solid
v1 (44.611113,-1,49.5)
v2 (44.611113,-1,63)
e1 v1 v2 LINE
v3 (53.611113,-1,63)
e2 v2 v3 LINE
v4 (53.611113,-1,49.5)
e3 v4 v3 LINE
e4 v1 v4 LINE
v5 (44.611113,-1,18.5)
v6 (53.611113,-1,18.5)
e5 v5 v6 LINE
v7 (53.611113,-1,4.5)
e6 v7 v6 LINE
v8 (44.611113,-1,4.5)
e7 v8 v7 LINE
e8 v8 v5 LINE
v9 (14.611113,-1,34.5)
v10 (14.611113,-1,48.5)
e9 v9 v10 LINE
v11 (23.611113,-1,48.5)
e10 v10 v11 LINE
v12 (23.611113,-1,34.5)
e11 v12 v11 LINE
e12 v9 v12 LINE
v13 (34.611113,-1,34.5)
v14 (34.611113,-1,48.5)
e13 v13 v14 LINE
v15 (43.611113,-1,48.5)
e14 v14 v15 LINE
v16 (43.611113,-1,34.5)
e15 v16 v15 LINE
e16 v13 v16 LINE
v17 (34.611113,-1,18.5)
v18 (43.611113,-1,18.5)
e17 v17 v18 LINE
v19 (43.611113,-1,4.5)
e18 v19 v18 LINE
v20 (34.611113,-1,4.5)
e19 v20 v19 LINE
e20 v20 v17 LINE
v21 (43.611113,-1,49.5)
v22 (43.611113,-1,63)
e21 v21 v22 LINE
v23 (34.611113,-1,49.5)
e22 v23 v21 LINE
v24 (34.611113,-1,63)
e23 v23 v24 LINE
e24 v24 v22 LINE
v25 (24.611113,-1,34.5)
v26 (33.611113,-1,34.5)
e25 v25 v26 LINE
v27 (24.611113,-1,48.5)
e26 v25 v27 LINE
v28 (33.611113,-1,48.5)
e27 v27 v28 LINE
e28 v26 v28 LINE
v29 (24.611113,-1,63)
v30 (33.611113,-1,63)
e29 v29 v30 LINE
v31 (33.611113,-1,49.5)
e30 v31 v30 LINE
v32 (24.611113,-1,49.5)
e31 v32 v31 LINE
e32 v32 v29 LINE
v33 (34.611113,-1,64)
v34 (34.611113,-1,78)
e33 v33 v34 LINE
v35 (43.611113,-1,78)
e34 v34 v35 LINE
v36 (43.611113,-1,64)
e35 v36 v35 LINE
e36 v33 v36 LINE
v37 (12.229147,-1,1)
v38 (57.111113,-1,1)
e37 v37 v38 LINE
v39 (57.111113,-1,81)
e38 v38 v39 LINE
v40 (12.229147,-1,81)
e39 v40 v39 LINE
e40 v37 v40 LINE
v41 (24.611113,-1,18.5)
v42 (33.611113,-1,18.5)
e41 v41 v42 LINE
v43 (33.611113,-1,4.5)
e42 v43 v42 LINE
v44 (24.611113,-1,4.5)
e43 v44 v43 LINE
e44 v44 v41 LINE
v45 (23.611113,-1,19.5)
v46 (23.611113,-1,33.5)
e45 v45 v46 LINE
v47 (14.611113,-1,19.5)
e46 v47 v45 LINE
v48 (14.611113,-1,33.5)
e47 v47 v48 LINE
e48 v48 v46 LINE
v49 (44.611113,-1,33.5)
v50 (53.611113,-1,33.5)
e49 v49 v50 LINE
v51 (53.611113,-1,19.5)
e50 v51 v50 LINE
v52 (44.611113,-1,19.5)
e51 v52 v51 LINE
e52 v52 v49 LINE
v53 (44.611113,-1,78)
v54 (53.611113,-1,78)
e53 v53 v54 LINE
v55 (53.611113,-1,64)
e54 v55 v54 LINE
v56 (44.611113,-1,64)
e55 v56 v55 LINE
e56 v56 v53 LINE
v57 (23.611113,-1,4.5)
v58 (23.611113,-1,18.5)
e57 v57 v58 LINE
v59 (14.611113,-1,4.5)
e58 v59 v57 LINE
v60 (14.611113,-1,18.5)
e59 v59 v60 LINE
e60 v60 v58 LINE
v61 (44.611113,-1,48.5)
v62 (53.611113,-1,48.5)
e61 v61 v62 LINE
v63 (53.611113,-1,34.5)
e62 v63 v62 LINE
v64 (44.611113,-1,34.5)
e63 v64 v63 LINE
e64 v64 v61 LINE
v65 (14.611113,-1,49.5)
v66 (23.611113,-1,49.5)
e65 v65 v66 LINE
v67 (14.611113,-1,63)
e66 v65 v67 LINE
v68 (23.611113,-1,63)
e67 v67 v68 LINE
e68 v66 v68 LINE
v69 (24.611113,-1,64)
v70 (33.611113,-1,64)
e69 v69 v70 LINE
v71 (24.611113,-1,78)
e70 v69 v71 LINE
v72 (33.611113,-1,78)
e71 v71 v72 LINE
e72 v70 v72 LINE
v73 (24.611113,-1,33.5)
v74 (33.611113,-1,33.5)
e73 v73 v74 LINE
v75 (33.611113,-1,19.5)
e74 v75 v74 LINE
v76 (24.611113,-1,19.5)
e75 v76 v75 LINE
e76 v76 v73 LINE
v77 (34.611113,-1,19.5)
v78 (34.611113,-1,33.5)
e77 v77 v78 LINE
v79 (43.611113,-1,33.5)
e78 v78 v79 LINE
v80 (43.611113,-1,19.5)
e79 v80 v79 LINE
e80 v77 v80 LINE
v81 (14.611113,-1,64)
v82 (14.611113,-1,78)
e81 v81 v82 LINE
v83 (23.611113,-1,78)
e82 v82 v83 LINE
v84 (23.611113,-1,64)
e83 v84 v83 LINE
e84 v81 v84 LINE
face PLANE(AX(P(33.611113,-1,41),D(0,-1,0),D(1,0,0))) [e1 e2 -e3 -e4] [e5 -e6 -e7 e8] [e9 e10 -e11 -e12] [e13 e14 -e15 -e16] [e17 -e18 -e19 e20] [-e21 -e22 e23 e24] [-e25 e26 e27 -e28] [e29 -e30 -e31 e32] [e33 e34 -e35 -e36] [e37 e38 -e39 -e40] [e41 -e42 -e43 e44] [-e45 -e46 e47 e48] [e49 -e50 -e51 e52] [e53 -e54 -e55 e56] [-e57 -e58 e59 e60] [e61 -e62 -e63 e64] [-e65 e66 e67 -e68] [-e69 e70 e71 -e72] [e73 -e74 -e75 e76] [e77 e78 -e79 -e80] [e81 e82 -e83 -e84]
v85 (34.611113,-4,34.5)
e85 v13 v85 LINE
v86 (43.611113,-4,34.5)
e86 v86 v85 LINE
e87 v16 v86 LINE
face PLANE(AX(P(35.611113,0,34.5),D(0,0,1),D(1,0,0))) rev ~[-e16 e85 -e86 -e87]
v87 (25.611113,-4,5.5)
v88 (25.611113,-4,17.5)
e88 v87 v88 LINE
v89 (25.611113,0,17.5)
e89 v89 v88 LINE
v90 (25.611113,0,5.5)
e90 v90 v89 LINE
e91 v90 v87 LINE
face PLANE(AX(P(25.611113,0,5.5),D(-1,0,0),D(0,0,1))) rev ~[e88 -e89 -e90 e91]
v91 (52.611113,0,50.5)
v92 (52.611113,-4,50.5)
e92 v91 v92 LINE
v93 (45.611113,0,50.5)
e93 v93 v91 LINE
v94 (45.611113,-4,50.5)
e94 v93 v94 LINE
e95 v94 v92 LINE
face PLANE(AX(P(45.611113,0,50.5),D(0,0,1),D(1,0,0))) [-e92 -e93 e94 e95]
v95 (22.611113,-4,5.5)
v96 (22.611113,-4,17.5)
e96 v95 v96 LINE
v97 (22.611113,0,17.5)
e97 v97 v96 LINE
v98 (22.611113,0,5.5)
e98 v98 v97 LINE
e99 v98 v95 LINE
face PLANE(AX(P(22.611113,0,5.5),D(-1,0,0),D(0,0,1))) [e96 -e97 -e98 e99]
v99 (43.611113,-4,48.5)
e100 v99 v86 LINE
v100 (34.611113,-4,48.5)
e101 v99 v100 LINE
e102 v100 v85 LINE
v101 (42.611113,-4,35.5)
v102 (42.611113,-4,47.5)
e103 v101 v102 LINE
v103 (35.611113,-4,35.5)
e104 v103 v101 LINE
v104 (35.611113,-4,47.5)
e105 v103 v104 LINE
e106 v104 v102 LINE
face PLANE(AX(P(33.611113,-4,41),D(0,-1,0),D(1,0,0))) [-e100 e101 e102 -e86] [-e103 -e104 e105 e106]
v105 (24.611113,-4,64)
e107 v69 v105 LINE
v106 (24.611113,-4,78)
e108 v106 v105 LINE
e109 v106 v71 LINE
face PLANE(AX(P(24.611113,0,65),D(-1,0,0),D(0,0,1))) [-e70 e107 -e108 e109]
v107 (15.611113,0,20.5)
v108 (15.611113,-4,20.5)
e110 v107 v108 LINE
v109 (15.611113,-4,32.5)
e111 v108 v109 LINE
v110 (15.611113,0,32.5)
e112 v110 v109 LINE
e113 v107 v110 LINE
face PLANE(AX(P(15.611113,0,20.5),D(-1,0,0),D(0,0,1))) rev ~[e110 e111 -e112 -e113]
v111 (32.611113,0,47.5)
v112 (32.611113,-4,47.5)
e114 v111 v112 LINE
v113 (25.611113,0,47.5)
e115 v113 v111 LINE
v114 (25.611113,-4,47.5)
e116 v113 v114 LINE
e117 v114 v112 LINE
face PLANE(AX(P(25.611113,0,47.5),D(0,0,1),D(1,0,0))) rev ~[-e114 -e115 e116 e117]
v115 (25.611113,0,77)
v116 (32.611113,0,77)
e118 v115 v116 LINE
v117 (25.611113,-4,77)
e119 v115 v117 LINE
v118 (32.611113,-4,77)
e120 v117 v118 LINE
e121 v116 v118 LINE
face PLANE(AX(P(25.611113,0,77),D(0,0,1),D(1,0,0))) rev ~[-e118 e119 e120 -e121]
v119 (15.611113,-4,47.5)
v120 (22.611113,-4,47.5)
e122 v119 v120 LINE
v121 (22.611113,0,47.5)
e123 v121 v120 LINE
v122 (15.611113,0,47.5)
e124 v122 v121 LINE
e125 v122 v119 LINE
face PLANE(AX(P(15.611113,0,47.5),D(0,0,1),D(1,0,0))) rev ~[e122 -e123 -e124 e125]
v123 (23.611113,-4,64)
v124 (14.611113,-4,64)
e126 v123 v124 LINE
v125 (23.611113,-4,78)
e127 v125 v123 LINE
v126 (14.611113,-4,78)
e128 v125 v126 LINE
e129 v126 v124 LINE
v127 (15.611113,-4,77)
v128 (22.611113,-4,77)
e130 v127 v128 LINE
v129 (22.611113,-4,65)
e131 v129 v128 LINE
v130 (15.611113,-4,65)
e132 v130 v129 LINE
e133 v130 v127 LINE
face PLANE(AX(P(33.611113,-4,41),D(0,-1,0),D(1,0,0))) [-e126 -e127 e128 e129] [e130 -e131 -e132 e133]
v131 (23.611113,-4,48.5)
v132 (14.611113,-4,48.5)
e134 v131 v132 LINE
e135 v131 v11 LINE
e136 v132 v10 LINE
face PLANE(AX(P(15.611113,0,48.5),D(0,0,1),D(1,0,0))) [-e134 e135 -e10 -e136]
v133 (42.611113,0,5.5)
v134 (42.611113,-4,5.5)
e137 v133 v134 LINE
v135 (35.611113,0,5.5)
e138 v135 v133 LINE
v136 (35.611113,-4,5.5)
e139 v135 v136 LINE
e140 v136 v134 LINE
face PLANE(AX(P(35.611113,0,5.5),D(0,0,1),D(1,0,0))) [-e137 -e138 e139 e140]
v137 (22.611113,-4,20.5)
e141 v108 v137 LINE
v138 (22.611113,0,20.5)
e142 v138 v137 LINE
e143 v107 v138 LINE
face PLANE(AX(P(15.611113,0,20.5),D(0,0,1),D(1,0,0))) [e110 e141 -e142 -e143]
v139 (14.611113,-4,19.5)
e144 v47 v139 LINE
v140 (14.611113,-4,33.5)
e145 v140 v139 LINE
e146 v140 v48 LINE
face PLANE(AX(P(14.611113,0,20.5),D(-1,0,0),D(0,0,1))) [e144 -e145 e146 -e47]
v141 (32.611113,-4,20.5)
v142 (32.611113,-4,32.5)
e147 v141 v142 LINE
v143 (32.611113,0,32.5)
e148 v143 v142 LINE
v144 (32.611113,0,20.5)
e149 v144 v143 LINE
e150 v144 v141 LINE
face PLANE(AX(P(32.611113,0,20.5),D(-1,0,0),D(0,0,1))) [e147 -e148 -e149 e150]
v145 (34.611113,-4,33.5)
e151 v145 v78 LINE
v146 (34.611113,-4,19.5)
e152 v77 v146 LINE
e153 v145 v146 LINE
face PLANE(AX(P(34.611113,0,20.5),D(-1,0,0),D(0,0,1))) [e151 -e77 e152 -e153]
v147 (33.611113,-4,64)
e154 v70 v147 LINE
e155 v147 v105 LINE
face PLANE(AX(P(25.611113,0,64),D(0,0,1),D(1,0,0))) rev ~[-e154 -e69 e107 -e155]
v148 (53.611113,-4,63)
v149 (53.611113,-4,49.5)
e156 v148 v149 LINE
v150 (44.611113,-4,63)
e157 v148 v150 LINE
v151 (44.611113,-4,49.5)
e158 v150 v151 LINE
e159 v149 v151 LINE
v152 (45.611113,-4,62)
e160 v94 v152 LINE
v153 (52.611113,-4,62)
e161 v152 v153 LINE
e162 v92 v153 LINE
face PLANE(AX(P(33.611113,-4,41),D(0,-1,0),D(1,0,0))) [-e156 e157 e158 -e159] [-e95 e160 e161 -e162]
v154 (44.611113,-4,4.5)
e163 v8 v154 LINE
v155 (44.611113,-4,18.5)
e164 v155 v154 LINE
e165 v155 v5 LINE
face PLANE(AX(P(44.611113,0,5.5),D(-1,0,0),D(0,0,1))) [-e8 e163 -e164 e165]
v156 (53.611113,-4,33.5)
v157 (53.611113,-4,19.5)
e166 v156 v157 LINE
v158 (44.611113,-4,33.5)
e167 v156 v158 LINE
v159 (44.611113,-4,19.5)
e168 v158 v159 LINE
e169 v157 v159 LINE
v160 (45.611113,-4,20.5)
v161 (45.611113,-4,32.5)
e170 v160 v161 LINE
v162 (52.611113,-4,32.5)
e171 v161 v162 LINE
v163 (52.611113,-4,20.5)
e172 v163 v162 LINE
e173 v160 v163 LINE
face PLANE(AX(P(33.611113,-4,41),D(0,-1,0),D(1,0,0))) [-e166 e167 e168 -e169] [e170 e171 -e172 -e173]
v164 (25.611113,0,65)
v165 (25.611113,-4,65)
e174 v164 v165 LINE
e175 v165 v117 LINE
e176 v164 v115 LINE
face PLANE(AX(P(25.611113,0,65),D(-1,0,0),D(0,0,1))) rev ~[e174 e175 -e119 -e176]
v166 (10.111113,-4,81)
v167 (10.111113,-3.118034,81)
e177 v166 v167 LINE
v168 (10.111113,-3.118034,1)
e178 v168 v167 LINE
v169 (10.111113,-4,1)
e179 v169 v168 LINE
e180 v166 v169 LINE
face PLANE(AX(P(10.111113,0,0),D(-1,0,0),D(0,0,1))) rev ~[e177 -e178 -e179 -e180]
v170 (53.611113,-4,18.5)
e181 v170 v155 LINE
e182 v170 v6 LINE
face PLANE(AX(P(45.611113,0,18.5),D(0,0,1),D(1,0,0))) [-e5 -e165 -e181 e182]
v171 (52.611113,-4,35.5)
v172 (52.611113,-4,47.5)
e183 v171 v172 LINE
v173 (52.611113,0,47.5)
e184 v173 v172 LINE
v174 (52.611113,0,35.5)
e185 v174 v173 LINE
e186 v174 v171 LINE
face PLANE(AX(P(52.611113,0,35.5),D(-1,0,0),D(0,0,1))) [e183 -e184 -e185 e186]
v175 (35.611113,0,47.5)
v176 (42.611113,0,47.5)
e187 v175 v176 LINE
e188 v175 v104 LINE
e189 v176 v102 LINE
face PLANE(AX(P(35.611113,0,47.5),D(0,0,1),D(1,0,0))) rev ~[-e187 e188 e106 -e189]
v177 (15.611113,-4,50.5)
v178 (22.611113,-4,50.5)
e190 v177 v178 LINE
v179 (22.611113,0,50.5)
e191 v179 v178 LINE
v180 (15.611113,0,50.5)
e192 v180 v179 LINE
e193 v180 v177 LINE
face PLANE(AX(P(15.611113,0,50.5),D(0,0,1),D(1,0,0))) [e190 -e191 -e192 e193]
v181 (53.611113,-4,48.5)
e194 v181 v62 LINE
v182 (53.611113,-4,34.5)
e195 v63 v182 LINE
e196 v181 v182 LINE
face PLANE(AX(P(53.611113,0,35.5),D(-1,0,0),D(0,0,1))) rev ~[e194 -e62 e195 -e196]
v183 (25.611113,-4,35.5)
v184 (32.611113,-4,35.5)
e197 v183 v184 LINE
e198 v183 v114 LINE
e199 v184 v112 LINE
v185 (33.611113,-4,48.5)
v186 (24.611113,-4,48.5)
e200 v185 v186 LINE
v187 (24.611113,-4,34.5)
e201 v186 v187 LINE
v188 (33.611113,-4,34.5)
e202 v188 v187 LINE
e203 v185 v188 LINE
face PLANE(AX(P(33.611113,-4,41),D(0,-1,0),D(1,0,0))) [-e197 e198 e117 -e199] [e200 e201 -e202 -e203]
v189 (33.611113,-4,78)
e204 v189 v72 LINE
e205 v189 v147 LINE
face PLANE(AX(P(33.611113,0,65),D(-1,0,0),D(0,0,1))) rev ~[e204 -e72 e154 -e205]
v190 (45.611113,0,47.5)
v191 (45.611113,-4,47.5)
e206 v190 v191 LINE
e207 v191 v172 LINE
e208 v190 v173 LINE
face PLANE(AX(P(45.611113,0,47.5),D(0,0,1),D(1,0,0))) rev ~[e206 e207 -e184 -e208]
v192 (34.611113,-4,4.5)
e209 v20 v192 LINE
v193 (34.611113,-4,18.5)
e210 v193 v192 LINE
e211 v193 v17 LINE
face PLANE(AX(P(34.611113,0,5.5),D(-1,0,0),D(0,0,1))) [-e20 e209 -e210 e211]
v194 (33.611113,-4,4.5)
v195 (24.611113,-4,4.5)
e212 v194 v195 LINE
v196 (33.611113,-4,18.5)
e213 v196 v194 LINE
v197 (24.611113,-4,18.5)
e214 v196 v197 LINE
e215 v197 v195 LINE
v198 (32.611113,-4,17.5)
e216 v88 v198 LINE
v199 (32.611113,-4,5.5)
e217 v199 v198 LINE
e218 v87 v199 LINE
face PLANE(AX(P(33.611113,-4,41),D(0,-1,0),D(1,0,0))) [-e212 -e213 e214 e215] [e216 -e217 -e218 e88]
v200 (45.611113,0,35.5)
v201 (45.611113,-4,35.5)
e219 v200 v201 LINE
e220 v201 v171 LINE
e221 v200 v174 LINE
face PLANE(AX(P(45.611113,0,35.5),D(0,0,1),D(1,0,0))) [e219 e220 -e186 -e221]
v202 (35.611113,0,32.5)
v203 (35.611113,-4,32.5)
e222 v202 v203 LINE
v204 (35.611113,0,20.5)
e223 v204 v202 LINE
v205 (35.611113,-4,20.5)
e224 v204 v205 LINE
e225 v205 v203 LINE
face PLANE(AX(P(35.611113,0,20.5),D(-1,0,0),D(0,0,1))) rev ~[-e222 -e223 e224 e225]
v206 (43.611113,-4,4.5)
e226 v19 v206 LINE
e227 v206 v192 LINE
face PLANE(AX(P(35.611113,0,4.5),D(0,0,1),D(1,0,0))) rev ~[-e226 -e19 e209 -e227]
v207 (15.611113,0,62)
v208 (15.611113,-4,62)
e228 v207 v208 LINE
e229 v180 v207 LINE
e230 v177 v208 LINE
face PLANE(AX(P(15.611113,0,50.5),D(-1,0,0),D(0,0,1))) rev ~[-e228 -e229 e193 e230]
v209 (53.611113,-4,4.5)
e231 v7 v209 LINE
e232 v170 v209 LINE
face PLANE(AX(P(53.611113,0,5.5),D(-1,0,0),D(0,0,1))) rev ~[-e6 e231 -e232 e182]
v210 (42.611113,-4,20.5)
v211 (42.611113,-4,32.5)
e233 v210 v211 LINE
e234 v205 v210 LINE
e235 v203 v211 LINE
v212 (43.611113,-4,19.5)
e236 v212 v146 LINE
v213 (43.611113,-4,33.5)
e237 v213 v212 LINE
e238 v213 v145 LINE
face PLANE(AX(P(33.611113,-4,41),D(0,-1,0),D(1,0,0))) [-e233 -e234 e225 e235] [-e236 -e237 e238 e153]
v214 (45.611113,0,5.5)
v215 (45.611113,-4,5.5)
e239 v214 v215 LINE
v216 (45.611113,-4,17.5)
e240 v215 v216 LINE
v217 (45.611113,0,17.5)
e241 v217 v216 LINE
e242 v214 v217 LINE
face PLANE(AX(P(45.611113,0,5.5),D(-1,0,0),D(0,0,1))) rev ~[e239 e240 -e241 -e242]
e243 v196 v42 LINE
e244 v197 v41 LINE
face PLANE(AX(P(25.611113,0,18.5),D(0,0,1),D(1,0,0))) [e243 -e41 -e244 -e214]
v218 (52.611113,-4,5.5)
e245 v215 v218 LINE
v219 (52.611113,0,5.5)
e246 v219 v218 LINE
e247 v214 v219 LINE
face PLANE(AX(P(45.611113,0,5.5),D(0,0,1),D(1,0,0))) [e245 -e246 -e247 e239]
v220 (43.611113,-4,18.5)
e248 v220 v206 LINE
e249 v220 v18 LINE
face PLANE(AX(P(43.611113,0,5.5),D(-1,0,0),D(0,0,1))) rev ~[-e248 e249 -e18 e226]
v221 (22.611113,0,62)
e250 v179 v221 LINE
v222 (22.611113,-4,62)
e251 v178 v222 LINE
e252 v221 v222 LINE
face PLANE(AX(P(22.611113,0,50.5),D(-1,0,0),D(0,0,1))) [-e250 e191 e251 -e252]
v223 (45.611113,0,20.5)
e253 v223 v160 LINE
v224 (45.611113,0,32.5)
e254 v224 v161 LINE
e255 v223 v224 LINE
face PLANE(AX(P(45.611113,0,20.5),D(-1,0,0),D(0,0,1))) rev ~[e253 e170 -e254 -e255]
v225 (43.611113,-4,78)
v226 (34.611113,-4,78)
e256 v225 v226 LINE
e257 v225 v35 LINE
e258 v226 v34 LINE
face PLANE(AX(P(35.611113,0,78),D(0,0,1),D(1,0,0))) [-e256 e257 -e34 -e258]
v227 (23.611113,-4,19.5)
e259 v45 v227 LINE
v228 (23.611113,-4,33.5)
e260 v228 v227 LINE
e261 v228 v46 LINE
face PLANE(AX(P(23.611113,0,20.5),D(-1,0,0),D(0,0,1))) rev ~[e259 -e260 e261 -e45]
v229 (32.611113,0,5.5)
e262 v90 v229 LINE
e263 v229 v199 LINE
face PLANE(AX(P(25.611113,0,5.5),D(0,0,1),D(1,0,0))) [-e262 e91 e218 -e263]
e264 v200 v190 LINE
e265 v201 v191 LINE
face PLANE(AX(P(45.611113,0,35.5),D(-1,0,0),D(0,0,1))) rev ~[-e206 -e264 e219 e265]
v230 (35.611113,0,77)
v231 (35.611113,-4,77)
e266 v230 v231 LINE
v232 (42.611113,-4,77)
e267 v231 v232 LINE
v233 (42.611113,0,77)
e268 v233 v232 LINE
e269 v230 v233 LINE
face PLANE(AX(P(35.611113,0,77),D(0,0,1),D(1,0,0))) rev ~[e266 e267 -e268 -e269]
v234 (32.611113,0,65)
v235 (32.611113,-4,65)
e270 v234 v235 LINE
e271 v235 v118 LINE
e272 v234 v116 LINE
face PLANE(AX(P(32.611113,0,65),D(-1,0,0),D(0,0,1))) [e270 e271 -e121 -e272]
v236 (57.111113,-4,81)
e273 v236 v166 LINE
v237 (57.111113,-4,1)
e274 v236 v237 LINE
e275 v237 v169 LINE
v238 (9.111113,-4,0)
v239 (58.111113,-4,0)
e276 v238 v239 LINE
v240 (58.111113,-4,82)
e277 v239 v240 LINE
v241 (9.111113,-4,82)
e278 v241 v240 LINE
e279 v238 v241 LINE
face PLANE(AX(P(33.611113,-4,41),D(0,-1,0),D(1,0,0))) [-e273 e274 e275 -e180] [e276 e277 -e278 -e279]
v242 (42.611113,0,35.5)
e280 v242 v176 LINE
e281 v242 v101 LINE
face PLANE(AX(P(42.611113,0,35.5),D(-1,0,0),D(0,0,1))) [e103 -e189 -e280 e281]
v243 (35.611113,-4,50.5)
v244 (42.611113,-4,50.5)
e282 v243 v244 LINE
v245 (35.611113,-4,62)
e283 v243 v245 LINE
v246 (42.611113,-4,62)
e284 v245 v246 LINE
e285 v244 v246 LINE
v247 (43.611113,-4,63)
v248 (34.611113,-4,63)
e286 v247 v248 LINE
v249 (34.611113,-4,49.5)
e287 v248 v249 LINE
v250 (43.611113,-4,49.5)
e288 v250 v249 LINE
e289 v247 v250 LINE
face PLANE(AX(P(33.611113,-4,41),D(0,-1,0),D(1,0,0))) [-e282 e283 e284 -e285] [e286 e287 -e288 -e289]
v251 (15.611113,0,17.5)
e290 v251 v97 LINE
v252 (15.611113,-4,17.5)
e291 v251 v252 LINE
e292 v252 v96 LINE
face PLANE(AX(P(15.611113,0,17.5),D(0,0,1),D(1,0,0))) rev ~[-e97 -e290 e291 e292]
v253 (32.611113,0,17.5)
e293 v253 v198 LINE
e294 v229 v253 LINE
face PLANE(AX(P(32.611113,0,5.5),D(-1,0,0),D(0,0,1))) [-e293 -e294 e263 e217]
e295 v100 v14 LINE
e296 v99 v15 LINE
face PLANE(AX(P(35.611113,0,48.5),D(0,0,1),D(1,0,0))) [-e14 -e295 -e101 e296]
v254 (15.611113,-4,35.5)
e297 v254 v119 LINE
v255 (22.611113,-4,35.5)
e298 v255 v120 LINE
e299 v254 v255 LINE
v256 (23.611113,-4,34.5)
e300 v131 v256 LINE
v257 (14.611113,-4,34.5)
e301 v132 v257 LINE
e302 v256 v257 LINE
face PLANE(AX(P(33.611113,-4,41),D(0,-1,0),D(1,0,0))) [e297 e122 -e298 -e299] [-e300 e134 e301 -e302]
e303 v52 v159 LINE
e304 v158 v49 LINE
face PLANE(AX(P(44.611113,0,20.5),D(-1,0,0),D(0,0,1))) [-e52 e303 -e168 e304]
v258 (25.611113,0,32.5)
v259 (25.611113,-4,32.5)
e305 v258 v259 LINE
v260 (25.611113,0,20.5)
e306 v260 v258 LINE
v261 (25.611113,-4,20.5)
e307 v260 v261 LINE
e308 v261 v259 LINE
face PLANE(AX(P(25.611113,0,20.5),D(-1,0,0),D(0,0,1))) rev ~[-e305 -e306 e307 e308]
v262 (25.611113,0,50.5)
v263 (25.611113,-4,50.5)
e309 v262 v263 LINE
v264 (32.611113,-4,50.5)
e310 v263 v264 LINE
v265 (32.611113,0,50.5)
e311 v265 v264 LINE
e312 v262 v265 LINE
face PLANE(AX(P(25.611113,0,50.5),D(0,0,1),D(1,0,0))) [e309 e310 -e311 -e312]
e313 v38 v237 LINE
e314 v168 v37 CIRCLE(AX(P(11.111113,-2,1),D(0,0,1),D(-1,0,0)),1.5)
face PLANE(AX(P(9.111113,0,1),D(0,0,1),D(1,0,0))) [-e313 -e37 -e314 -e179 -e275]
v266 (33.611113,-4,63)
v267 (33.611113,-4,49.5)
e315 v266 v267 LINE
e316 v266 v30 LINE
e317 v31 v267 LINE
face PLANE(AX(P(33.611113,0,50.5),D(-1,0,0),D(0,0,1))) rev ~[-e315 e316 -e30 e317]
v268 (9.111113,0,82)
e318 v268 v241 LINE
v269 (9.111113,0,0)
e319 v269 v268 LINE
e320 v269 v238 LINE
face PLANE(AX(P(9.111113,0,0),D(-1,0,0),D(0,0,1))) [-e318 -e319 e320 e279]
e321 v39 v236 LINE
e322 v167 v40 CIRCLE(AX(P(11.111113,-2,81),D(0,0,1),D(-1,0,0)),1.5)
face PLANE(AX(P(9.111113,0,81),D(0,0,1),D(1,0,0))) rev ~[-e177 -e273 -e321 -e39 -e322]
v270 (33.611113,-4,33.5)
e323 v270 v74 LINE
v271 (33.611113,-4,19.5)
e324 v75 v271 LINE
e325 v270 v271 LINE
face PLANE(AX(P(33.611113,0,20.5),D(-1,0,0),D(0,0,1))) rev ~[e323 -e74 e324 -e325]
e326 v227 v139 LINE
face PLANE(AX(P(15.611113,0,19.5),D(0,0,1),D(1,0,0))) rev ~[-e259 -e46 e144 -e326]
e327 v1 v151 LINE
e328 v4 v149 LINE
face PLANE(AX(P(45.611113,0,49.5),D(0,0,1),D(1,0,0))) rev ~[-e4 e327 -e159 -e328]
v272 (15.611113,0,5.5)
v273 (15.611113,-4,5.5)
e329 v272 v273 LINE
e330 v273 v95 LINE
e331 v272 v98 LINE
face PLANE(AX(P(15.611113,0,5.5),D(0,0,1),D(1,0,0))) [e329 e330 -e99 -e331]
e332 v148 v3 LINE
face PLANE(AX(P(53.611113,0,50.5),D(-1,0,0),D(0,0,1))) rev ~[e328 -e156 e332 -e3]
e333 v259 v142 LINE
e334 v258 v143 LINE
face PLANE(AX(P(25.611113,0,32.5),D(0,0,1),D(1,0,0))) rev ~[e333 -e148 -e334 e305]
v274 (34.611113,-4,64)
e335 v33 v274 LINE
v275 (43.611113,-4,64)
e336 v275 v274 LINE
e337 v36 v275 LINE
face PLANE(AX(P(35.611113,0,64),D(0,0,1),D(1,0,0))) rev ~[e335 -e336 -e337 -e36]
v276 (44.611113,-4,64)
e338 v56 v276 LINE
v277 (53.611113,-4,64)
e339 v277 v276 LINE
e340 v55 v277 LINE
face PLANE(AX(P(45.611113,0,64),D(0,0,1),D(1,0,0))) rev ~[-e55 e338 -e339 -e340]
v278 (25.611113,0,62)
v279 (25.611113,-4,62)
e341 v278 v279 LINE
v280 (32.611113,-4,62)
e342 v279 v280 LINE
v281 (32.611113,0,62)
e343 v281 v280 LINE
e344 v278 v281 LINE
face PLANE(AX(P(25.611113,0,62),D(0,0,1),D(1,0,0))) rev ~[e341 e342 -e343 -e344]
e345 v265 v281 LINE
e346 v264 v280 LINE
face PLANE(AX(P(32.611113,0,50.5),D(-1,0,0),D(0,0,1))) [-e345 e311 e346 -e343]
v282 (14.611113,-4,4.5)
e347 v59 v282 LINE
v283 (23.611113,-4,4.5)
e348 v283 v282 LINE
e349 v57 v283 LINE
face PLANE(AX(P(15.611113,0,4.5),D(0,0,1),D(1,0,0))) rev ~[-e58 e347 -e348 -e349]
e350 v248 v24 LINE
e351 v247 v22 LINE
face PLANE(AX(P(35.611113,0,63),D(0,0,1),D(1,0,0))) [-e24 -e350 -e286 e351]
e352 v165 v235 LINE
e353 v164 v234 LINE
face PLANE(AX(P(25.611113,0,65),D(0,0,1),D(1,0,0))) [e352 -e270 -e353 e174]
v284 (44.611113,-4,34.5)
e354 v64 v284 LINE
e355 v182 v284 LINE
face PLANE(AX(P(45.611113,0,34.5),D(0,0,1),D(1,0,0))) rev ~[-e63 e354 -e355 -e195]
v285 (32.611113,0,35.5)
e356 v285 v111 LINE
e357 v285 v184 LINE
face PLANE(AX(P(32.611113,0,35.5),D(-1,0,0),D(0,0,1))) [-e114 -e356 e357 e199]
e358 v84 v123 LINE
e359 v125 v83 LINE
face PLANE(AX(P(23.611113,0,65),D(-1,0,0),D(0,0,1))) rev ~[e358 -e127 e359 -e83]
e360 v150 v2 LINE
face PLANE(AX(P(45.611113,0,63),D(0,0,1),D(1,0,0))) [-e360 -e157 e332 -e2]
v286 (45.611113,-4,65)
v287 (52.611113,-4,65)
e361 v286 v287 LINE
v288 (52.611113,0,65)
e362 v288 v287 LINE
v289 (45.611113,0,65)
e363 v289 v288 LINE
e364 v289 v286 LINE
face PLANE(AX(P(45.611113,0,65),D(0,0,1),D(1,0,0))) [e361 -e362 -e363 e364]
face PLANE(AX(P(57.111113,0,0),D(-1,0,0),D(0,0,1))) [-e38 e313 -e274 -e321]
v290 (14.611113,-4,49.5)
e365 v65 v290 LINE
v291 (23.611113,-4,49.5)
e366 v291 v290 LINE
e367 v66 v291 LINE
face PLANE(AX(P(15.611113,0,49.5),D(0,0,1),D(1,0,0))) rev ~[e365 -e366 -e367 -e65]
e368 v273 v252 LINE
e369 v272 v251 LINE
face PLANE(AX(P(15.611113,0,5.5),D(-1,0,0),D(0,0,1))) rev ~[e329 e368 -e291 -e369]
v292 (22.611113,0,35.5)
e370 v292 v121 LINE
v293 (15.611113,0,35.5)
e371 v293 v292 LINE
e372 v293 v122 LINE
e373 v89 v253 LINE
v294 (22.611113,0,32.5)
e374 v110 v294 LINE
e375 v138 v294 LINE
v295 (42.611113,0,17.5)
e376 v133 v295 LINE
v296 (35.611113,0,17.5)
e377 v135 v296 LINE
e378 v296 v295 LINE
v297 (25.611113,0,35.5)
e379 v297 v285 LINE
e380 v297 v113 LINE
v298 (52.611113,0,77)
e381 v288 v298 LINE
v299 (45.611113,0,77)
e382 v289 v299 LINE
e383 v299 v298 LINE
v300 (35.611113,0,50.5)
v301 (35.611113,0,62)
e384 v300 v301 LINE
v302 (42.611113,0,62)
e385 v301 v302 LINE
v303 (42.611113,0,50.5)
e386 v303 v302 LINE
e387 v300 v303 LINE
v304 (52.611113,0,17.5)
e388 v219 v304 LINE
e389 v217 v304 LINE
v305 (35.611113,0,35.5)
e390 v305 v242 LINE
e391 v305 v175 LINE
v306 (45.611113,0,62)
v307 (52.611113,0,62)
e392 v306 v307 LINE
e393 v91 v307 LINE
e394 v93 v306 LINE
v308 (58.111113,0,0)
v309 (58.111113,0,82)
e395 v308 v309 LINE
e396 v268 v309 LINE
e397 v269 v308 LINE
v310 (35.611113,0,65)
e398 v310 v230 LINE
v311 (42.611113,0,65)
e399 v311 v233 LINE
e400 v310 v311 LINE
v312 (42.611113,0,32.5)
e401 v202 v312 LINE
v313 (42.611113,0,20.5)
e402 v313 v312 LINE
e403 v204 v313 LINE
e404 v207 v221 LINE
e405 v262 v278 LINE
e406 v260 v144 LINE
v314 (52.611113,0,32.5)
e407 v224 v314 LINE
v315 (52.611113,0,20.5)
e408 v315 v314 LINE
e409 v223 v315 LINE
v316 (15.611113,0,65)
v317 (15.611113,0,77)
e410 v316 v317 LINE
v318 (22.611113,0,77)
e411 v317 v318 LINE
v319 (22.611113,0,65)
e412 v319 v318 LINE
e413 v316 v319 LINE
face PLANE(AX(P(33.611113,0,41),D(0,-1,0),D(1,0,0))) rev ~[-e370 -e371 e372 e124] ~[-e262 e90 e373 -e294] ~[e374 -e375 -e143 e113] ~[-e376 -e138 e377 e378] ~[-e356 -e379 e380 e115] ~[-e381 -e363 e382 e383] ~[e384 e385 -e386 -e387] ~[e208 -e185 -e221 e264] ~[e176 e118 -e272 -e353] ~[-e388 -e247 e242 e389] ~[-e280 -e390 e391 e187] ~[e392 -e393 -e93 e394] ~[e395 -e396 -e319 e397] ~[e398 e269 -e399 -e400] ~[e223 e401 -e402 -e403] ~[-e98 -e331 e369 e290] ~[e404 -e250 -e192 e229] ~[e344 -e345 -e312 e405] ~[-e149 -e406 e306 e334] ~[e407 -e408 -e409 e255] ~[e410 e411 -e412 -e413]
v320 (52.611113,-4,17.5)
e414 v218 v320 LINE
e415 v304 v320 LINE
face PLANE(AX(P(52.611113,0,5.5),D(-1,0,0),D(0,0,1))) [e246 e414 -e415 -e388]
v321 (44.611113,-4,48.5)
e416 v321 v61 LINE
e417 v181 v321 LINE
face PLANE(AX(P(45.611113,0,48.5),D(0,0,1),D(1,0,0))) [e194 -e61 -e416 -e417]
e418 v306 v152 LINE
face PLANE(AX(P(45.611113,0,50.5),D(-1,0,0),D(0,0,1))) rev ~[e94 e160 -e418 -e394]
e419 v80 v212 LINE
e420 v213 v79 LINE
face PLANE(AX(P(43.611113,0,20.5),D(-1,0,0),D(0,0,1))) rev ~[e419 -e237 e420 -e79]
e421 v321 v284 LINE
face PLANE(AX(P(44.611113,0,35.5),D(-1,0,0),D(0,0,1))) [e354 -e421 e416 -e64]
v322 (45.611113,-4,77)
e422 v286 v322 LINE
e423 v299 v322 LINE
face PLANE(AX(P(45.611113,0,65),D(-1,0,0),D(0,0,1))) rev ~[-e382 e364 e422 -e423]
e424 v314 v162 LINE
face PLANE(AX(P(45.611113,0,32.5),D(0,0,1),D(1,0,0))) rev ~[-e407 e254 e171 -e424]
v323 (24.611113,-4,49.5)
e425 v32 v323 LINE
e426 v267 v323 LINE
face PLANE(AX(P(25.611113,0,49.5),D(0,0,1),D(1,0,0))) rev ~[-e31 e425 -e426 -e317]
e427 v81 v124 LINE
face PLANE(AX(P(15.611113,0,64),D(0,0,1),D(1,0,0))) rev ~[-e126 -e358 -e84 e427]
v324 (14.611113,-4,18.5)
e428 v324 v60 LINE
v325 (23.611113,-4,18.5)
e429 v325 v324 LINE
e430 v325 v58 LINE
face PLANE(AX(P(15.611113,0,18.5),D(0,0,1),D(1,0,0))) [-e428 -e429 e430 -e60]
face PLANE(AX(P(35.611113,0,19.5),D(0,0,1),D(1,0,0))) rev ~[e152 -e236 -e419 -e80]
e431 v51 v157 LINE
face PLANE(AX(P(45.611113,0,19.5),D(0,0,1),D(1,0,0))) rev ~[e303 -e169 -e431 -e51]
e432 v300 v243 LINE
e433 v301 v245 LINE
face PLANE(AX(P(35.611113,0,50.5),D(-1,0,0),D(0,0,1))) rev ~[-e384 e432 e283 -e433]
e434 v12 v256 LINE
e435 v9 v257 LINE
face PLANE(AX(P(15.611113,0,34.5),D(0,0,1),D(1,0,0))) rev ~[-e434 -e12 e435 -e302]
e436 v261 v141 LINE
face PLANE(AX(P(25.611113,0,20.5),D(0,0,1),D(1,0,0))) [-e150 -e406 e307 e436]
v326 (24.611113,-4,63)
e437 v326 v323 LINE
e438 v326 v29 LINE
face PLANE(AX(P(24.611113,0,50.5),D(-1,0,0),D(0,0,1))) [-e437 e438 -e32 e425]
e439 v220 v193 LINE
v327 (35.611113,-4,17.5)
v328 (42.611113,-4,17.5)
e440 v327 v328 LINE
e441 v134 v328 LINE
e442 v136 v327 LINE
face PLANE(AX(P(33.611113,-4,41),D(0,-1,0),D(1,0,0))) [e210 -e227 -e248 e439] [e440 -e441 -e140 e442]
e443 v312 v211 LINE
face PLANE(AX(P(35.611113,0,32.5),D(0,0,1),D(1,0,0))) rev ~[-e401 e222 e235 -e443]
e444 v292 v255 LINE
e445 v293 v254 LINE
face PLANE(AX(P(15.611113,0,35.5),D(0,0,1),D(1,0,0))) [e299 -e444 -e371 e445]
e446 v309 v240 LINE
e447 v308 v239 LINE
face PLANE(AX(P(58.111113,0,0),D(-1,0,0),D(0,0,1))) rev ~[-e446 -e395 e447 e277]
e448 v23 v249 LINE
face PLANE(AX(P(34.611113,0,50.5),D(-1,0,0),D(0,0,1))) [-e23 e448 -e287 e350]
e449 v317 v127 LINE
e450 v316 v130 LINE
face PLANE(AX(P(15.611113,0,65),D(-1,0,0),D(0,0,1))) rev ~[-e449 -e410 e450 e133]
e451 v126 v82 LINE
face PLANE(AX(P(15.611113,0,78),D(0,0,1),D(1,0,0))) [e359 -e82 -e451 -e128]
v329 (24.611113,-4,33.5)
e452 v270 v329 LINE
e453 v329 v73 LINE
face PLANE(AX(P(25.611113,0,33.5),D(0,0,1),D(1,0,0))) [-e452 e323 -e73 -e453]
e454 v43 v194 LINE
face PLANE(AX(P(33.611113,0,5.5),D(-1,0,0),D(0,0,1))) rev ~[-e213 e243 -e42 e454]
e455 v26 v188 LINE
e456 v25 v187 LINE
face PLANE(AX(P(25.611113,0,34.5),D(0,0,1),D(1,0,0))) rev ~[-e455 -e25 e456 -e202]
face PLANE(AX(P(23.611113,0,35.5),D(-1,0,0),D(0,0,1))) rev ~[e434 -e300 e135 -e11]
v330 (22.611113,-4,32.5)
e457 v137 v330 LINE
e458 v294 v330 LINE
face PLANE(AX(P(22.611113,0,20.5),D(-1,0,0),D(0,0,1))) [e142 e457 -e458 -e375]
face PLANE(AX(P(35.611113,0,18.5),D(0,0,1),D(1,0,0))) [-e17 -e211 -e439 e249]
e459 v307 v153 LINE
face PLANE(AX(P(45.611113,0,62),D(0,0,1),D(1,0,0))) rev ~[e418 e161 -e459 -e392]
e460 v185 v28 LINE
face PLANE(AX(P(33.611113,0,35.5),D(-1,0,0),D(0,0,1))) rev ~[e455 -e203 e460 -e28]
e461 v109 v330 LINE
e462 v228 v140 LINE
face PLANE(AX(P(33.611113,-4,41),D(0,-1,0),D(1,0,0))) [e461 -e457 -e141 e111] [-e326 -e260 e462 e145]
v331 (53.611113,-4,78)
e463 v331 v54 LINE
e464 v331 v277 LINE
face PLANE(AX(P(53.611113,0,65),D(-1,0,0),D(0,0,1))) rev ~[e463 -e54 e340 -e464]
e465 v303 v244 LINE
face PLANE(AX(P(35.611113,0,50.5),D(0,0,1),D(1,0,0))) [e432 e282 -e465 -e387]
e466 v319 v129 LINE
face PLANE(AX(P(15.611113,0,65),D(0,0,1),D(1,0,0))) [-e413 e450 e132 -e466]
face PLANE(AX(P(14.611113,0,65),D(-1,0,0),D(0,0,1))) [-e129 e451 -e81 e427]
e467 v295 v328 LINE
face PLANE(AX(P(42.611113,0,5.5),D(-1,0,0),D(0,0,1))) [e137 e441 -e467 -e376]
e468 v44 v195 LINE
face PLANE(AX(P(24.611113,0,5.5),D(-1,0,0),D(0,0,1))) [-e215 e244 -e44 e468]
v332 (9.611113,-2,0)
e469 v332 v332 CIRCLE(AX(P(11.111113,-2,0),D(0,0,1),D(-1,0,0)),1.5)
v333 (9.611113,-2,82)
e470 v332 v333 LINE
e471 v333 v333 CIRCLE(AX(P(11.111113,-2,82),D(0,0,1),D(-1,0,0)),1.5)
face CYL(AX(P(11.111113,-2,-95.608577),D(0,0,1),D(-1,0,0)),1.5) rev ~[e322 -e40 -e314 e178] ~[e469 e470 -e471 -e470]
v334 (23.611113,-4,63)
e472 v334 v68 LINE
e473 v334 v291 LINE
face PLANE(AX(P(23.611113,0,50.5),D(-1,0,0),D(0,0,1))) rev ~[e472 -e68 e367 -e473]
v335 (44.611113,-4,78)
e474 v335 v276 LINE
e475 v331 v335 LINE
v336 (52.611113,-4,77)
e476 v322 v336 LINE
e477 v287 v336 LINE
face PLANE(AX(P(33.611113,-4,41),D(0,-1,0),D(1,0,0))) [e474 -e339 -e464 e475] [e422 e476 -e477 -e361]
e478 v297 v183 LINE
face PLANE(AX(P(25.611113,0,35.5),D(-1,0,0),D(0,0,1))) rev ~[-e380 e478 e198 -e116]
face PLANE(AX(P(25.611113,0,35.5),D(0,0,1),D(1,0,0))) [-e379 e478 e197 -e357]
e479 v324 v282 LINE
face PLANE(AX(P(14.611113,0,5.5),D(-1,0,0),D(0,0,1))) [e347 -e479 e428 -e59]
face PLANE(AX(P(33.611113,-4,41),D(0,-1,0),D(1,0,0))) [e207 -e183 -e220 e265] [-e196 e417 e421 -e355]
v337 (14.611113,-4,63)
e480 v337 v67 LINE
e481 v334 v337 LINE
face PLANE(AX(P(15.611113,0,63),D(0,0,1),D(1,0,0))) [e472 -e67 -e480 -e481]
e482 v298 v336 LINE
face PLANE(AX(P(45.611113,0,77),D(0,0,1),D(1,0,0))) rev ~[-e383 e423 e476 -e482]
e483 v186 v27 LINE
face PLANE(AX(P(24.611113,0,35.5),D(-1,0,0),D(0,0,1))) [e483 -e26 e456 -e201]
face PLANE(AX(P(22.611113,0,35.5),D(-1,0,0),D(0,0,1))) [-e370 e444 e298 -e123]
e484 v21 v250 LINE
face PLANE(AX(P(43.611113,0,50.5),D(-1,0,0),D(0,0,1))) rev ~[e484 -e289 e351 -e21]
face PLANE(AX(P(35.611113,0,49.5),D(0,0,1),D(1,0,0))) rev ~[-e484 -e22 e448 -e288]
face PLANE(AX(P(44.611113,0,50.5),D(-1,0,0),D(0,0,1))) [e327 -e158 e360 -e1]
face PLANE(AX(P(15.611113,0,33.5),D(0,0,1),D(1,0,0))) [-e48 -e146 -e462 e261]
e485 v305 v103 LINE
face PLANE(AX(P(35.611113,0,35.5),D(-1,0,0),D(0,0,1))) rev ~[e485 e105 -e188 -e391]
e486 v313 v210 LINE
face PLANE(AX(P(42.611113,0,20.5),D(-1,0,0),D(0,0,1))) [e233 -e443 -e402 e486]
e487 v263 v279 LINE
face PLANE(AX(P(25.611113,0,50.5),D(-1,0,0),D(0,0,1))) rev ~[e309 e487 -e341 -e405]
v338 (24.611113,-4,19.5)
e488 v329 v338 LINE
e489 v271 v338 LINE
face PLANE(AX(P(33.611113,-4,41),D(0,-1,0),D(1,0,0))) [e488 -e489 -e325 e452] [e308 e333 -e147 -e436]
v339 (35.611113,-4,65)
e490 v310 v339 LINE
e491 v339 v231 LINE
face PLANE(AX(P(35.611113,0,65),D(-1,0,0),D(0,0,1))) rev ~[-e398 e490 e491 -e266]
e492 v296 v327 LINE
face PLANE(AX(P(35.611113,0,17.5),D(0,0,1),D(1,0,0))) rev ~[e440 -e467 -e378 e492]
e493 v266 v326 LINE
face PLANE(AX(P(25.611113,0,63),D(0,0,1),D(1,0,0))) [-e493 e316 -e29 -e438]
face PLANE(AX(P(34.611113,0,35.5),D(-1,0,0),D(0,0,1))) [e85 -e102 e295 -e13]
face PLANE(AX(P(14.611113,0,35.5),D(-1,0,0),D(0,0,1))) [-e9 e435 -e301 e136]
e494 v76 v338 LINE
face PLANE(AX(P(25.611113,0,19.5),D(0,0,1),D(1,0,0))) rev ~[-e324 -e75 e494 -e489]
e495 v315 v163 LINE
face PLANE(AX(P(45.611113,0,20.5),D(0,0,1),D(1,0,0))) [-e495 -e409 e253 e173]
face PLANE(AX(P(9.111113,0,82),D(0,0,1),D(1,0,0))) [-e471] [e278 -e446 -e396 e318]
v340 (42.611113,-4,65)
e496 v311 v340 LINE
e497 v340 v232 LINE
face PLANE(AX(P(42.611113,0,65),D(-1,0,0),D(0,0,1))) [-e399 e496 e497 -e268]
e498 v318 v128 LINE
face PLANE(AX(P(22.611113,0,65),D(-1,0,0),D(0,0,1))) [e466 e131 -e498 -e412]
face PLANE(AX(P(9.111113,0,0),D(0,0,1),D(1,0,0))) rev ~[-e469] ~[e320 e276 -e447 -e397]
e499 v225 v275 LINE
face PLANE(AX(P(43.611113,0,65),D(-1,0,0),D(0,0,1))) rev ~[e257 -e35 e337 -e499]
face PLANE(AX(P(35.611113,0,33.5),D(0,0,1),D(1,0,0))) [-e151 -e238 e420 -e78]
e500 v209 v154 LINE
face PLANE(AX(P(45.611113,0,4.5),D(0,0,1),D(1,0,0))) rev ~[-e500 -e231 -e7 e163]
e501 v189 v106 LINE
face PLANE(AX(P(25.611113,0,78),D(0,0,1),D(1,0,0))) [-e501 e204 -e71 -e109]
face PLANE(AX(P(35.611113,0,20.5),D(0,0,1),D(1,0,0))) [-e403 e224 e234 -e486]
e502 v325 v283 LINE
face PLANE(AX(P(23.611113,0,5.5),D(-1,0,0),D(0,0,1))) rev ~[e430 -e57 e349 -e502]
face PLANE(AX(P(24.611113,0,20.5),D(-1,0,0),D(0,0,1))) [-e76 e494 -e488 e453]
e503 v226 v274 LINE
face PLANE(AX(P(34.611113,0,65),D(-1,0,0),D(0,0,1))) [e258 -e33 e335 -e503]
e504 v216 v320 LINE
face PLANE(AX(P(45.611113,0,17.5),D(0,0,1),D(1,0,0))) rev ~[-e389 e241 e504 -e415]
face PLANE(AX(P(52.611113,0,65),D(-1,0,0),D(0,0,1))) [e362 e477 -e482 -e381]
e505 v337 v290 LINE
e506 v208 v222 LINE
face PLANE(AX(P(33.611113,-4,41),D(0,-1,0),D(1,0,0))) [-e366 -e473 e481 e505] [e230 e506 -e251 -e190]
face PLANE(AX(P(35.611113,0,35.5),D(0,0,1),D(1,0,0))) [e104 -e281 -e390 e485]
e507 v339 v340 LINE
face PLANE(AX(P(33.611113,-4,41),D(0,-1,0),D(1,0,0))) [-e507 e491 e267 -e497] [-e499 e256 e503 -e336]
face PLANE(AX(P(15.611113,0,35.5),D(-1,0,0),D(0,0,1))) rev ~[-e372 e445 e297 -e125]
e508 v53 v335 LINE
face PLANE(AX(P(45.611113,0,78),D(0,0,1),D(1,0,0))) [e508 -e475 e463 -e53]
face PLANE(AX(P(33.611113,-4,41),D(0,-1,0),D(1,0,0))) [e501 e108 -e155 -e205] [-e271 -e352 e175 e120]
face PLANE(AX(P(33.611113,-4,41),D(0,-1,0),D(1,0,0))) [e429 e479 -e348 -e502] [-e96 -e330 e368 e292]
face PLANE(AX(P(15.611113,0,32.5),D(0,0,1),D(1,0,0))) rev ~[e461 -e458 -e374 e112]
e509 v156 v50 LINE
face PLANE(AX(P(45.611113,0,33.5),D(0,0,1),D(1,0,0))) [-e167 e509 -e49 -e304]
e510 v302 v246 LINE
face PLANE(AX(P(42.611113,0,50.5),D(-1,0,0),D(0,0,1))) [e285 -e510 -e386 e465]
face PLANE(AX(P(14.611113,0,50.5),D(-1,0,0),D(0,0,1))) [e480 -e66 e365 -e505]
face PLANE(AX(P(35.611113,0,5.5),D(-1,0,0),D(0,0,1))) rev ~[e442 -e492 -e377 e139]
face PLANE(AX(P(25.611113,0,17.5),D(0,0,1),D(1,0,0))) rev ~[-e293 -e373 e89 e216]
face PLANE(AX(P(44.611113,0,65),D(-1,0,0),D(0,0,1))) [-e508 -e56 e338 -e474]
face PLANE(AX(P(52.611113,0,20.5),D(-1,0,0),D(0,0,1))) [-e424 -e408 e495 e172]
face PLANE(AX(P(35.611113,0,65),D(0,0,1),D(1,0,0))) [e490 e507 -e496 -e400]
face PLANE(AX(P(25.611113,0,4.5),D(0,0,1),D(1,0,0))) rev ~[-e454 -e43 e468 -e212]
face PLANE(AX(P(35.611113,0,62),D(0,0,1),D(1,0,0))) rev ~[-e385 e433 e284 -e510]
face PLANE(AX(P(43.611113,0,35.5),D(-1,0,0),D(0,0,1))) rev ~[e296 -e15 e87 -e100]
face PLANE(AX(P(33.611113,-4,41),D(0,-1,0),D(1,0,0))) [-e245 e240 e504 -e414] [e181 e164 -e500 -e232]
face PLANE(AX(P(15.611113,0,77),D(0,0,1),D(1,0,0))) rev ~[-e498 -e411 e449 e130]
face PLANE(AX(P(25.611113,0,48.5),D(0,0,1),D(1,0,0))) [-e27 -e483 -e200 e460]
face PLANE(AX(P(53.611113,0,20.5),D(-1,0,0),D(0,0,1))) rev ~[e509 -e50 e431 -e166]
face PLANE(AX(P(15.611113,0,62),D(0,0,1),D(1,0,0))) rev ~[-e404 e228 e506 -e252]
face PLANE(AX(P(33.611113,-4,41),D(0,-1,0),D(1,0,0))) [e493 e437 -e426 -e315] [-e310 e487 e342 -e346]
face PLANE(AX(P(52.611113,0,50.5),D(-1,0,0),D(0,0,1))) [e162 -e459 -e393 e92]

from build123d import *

# Parameters (mm, degrees)
F0_W     = 49
F0_H     = 82
F0_W_2   = 40
F0_H_2   = 74
F0_W_3   = 7
F0_H_3   = 12
F0_H_4   = 11.5
F1_DEPTH = 4
F2_T     = -1
F4_D     = 3


# Not quite as in the source:
# - a feature names something its author has since deleted; it is built from what else it names


with BuildPart() as f1:
    # F0 (on Front) → F1 (new body)
    with BuildSketch(Plane.XZ):
        with Locations((33.611113002, 41)):
            Rectangle(F0_W, F0_H)
        with Locations((34.111113002, 41)):
            Rectangle(F0_W_2, F0_H_2, mode=Mode.SUBTRACT)
        with Locations((34.111113002, 41)):
            Rectangle(F0_W_2, F0_H_2)
        with Locations((19.111113002, 11.5)):
            Rectangle(F0_W_3, F0_H_3, mode=Mode.SUBTRACT)
        with Locations((29.111113002, 11.5)):
            Rectangle(F0_W_3, F0_H_3, mode=Mode.SUBTRACT)
        with Locations((19.111113002, 26.5)):
            Rectangle(F0_W_3, F0_H_3, mode=Mode.SUBTRACT)
        with Locations((29.111113002, 26.5)):
            Rectangle(F0_W_3, F0_H_3, mode=Mode.SUBTRACT)
        with Locations((39.111113002, 11.5)):
            Rectangle(F0_W_3, F0_H_3, mode=Mode.SUBTRACT)
        with Locations((49.111113002, 11.5)):
            Rectangle(F0_W_3, F0_H_3, mode=Mode.SUBTRACT)
        with Locations((39.111113002, 26.5)):
            Rectangle(F0_W_3, F0_H_3, mode=Mode.SUBTRACT)
        with Locations((49.111113002, 26.5)):
            Rectangle(F0_W_3, F0_H_3, mode=Mode.SUBTRACT)
        with Locations((19.111113002, 41.5)):
            Rectangle(F0_W_3, F0_H_3, mode=Mode.SUBTRACT)
        with Locations((19.111113002, 56.25)):
            Rectangle(F0_W_3, F0_H_4, mode=Mode.SUBTRACT)
        with Locations((29.111113002, 41.5)):
            Rectangle(F0_W_3, F0_H_3, mode=Mode.SUBTRACT)
        with Locations((29.111113002, 56.25)):
            Rectangle(F0_W_3, F0_H_4, mode=Mode.SUBTRACT)
        with Locations((19.111113002, 71)):
            Rectangle(F0_W_3, F0_H_3, mode=Mode.SUBTRACT)
        with Locations((29.111113002, 71)):
            Rectangle(F0_W_3, F0_H_3, mode=Mode.SUBTRACT)
        with Locations((39.111113002, 41.5)):
            Rectangle(F0_W_3, F0_H_3, mode=Mode.SUBTRACT)
        with Locations((39.111113002, 56.25)):
            Rectangle(F0_W_3, F0_H_4, mode=Mode.SUBTRACT)
        with Locations((49.111113002, 41.5)):
            Rectangle(F0_W_3, F0_H_3, mode=Mode.SUBTRACT)
        with Locations((49.111113002, 56.25)):
            Rectangle(F0_W_3, F0_H_4, mode=Mode.SUBTRACT)
        with Locations((39.111113002, 71)):
            Rectangle(F0_W_3, F0_H_3, mode=Mode.SUBTRACT)
        with Locations((49.111113002, 71)):
            Rectangle(F0_W_3, F0_H_3, mode=Mode.SUBTRACT)
    extrude(amount=F1_DEPTH)

    # F2
    f2_openings = [f1.faces().sort_by_distance(p)[0] for p in [
        (33.256946, -4, 40.840774),
    ]]
    offset(amount=F2_T, openings=f2_openings, kind=Kind.INTERSECTION)

    # F4 (through all)
    with Locations(Plane(origin=(0, 0, 0), x_dir=(1, 0, 0), z_dir=(0, 0, -1))):
        with Locations((11.111113002, 2)):
            Hole(F4_D / 2)


solid = f1.part
